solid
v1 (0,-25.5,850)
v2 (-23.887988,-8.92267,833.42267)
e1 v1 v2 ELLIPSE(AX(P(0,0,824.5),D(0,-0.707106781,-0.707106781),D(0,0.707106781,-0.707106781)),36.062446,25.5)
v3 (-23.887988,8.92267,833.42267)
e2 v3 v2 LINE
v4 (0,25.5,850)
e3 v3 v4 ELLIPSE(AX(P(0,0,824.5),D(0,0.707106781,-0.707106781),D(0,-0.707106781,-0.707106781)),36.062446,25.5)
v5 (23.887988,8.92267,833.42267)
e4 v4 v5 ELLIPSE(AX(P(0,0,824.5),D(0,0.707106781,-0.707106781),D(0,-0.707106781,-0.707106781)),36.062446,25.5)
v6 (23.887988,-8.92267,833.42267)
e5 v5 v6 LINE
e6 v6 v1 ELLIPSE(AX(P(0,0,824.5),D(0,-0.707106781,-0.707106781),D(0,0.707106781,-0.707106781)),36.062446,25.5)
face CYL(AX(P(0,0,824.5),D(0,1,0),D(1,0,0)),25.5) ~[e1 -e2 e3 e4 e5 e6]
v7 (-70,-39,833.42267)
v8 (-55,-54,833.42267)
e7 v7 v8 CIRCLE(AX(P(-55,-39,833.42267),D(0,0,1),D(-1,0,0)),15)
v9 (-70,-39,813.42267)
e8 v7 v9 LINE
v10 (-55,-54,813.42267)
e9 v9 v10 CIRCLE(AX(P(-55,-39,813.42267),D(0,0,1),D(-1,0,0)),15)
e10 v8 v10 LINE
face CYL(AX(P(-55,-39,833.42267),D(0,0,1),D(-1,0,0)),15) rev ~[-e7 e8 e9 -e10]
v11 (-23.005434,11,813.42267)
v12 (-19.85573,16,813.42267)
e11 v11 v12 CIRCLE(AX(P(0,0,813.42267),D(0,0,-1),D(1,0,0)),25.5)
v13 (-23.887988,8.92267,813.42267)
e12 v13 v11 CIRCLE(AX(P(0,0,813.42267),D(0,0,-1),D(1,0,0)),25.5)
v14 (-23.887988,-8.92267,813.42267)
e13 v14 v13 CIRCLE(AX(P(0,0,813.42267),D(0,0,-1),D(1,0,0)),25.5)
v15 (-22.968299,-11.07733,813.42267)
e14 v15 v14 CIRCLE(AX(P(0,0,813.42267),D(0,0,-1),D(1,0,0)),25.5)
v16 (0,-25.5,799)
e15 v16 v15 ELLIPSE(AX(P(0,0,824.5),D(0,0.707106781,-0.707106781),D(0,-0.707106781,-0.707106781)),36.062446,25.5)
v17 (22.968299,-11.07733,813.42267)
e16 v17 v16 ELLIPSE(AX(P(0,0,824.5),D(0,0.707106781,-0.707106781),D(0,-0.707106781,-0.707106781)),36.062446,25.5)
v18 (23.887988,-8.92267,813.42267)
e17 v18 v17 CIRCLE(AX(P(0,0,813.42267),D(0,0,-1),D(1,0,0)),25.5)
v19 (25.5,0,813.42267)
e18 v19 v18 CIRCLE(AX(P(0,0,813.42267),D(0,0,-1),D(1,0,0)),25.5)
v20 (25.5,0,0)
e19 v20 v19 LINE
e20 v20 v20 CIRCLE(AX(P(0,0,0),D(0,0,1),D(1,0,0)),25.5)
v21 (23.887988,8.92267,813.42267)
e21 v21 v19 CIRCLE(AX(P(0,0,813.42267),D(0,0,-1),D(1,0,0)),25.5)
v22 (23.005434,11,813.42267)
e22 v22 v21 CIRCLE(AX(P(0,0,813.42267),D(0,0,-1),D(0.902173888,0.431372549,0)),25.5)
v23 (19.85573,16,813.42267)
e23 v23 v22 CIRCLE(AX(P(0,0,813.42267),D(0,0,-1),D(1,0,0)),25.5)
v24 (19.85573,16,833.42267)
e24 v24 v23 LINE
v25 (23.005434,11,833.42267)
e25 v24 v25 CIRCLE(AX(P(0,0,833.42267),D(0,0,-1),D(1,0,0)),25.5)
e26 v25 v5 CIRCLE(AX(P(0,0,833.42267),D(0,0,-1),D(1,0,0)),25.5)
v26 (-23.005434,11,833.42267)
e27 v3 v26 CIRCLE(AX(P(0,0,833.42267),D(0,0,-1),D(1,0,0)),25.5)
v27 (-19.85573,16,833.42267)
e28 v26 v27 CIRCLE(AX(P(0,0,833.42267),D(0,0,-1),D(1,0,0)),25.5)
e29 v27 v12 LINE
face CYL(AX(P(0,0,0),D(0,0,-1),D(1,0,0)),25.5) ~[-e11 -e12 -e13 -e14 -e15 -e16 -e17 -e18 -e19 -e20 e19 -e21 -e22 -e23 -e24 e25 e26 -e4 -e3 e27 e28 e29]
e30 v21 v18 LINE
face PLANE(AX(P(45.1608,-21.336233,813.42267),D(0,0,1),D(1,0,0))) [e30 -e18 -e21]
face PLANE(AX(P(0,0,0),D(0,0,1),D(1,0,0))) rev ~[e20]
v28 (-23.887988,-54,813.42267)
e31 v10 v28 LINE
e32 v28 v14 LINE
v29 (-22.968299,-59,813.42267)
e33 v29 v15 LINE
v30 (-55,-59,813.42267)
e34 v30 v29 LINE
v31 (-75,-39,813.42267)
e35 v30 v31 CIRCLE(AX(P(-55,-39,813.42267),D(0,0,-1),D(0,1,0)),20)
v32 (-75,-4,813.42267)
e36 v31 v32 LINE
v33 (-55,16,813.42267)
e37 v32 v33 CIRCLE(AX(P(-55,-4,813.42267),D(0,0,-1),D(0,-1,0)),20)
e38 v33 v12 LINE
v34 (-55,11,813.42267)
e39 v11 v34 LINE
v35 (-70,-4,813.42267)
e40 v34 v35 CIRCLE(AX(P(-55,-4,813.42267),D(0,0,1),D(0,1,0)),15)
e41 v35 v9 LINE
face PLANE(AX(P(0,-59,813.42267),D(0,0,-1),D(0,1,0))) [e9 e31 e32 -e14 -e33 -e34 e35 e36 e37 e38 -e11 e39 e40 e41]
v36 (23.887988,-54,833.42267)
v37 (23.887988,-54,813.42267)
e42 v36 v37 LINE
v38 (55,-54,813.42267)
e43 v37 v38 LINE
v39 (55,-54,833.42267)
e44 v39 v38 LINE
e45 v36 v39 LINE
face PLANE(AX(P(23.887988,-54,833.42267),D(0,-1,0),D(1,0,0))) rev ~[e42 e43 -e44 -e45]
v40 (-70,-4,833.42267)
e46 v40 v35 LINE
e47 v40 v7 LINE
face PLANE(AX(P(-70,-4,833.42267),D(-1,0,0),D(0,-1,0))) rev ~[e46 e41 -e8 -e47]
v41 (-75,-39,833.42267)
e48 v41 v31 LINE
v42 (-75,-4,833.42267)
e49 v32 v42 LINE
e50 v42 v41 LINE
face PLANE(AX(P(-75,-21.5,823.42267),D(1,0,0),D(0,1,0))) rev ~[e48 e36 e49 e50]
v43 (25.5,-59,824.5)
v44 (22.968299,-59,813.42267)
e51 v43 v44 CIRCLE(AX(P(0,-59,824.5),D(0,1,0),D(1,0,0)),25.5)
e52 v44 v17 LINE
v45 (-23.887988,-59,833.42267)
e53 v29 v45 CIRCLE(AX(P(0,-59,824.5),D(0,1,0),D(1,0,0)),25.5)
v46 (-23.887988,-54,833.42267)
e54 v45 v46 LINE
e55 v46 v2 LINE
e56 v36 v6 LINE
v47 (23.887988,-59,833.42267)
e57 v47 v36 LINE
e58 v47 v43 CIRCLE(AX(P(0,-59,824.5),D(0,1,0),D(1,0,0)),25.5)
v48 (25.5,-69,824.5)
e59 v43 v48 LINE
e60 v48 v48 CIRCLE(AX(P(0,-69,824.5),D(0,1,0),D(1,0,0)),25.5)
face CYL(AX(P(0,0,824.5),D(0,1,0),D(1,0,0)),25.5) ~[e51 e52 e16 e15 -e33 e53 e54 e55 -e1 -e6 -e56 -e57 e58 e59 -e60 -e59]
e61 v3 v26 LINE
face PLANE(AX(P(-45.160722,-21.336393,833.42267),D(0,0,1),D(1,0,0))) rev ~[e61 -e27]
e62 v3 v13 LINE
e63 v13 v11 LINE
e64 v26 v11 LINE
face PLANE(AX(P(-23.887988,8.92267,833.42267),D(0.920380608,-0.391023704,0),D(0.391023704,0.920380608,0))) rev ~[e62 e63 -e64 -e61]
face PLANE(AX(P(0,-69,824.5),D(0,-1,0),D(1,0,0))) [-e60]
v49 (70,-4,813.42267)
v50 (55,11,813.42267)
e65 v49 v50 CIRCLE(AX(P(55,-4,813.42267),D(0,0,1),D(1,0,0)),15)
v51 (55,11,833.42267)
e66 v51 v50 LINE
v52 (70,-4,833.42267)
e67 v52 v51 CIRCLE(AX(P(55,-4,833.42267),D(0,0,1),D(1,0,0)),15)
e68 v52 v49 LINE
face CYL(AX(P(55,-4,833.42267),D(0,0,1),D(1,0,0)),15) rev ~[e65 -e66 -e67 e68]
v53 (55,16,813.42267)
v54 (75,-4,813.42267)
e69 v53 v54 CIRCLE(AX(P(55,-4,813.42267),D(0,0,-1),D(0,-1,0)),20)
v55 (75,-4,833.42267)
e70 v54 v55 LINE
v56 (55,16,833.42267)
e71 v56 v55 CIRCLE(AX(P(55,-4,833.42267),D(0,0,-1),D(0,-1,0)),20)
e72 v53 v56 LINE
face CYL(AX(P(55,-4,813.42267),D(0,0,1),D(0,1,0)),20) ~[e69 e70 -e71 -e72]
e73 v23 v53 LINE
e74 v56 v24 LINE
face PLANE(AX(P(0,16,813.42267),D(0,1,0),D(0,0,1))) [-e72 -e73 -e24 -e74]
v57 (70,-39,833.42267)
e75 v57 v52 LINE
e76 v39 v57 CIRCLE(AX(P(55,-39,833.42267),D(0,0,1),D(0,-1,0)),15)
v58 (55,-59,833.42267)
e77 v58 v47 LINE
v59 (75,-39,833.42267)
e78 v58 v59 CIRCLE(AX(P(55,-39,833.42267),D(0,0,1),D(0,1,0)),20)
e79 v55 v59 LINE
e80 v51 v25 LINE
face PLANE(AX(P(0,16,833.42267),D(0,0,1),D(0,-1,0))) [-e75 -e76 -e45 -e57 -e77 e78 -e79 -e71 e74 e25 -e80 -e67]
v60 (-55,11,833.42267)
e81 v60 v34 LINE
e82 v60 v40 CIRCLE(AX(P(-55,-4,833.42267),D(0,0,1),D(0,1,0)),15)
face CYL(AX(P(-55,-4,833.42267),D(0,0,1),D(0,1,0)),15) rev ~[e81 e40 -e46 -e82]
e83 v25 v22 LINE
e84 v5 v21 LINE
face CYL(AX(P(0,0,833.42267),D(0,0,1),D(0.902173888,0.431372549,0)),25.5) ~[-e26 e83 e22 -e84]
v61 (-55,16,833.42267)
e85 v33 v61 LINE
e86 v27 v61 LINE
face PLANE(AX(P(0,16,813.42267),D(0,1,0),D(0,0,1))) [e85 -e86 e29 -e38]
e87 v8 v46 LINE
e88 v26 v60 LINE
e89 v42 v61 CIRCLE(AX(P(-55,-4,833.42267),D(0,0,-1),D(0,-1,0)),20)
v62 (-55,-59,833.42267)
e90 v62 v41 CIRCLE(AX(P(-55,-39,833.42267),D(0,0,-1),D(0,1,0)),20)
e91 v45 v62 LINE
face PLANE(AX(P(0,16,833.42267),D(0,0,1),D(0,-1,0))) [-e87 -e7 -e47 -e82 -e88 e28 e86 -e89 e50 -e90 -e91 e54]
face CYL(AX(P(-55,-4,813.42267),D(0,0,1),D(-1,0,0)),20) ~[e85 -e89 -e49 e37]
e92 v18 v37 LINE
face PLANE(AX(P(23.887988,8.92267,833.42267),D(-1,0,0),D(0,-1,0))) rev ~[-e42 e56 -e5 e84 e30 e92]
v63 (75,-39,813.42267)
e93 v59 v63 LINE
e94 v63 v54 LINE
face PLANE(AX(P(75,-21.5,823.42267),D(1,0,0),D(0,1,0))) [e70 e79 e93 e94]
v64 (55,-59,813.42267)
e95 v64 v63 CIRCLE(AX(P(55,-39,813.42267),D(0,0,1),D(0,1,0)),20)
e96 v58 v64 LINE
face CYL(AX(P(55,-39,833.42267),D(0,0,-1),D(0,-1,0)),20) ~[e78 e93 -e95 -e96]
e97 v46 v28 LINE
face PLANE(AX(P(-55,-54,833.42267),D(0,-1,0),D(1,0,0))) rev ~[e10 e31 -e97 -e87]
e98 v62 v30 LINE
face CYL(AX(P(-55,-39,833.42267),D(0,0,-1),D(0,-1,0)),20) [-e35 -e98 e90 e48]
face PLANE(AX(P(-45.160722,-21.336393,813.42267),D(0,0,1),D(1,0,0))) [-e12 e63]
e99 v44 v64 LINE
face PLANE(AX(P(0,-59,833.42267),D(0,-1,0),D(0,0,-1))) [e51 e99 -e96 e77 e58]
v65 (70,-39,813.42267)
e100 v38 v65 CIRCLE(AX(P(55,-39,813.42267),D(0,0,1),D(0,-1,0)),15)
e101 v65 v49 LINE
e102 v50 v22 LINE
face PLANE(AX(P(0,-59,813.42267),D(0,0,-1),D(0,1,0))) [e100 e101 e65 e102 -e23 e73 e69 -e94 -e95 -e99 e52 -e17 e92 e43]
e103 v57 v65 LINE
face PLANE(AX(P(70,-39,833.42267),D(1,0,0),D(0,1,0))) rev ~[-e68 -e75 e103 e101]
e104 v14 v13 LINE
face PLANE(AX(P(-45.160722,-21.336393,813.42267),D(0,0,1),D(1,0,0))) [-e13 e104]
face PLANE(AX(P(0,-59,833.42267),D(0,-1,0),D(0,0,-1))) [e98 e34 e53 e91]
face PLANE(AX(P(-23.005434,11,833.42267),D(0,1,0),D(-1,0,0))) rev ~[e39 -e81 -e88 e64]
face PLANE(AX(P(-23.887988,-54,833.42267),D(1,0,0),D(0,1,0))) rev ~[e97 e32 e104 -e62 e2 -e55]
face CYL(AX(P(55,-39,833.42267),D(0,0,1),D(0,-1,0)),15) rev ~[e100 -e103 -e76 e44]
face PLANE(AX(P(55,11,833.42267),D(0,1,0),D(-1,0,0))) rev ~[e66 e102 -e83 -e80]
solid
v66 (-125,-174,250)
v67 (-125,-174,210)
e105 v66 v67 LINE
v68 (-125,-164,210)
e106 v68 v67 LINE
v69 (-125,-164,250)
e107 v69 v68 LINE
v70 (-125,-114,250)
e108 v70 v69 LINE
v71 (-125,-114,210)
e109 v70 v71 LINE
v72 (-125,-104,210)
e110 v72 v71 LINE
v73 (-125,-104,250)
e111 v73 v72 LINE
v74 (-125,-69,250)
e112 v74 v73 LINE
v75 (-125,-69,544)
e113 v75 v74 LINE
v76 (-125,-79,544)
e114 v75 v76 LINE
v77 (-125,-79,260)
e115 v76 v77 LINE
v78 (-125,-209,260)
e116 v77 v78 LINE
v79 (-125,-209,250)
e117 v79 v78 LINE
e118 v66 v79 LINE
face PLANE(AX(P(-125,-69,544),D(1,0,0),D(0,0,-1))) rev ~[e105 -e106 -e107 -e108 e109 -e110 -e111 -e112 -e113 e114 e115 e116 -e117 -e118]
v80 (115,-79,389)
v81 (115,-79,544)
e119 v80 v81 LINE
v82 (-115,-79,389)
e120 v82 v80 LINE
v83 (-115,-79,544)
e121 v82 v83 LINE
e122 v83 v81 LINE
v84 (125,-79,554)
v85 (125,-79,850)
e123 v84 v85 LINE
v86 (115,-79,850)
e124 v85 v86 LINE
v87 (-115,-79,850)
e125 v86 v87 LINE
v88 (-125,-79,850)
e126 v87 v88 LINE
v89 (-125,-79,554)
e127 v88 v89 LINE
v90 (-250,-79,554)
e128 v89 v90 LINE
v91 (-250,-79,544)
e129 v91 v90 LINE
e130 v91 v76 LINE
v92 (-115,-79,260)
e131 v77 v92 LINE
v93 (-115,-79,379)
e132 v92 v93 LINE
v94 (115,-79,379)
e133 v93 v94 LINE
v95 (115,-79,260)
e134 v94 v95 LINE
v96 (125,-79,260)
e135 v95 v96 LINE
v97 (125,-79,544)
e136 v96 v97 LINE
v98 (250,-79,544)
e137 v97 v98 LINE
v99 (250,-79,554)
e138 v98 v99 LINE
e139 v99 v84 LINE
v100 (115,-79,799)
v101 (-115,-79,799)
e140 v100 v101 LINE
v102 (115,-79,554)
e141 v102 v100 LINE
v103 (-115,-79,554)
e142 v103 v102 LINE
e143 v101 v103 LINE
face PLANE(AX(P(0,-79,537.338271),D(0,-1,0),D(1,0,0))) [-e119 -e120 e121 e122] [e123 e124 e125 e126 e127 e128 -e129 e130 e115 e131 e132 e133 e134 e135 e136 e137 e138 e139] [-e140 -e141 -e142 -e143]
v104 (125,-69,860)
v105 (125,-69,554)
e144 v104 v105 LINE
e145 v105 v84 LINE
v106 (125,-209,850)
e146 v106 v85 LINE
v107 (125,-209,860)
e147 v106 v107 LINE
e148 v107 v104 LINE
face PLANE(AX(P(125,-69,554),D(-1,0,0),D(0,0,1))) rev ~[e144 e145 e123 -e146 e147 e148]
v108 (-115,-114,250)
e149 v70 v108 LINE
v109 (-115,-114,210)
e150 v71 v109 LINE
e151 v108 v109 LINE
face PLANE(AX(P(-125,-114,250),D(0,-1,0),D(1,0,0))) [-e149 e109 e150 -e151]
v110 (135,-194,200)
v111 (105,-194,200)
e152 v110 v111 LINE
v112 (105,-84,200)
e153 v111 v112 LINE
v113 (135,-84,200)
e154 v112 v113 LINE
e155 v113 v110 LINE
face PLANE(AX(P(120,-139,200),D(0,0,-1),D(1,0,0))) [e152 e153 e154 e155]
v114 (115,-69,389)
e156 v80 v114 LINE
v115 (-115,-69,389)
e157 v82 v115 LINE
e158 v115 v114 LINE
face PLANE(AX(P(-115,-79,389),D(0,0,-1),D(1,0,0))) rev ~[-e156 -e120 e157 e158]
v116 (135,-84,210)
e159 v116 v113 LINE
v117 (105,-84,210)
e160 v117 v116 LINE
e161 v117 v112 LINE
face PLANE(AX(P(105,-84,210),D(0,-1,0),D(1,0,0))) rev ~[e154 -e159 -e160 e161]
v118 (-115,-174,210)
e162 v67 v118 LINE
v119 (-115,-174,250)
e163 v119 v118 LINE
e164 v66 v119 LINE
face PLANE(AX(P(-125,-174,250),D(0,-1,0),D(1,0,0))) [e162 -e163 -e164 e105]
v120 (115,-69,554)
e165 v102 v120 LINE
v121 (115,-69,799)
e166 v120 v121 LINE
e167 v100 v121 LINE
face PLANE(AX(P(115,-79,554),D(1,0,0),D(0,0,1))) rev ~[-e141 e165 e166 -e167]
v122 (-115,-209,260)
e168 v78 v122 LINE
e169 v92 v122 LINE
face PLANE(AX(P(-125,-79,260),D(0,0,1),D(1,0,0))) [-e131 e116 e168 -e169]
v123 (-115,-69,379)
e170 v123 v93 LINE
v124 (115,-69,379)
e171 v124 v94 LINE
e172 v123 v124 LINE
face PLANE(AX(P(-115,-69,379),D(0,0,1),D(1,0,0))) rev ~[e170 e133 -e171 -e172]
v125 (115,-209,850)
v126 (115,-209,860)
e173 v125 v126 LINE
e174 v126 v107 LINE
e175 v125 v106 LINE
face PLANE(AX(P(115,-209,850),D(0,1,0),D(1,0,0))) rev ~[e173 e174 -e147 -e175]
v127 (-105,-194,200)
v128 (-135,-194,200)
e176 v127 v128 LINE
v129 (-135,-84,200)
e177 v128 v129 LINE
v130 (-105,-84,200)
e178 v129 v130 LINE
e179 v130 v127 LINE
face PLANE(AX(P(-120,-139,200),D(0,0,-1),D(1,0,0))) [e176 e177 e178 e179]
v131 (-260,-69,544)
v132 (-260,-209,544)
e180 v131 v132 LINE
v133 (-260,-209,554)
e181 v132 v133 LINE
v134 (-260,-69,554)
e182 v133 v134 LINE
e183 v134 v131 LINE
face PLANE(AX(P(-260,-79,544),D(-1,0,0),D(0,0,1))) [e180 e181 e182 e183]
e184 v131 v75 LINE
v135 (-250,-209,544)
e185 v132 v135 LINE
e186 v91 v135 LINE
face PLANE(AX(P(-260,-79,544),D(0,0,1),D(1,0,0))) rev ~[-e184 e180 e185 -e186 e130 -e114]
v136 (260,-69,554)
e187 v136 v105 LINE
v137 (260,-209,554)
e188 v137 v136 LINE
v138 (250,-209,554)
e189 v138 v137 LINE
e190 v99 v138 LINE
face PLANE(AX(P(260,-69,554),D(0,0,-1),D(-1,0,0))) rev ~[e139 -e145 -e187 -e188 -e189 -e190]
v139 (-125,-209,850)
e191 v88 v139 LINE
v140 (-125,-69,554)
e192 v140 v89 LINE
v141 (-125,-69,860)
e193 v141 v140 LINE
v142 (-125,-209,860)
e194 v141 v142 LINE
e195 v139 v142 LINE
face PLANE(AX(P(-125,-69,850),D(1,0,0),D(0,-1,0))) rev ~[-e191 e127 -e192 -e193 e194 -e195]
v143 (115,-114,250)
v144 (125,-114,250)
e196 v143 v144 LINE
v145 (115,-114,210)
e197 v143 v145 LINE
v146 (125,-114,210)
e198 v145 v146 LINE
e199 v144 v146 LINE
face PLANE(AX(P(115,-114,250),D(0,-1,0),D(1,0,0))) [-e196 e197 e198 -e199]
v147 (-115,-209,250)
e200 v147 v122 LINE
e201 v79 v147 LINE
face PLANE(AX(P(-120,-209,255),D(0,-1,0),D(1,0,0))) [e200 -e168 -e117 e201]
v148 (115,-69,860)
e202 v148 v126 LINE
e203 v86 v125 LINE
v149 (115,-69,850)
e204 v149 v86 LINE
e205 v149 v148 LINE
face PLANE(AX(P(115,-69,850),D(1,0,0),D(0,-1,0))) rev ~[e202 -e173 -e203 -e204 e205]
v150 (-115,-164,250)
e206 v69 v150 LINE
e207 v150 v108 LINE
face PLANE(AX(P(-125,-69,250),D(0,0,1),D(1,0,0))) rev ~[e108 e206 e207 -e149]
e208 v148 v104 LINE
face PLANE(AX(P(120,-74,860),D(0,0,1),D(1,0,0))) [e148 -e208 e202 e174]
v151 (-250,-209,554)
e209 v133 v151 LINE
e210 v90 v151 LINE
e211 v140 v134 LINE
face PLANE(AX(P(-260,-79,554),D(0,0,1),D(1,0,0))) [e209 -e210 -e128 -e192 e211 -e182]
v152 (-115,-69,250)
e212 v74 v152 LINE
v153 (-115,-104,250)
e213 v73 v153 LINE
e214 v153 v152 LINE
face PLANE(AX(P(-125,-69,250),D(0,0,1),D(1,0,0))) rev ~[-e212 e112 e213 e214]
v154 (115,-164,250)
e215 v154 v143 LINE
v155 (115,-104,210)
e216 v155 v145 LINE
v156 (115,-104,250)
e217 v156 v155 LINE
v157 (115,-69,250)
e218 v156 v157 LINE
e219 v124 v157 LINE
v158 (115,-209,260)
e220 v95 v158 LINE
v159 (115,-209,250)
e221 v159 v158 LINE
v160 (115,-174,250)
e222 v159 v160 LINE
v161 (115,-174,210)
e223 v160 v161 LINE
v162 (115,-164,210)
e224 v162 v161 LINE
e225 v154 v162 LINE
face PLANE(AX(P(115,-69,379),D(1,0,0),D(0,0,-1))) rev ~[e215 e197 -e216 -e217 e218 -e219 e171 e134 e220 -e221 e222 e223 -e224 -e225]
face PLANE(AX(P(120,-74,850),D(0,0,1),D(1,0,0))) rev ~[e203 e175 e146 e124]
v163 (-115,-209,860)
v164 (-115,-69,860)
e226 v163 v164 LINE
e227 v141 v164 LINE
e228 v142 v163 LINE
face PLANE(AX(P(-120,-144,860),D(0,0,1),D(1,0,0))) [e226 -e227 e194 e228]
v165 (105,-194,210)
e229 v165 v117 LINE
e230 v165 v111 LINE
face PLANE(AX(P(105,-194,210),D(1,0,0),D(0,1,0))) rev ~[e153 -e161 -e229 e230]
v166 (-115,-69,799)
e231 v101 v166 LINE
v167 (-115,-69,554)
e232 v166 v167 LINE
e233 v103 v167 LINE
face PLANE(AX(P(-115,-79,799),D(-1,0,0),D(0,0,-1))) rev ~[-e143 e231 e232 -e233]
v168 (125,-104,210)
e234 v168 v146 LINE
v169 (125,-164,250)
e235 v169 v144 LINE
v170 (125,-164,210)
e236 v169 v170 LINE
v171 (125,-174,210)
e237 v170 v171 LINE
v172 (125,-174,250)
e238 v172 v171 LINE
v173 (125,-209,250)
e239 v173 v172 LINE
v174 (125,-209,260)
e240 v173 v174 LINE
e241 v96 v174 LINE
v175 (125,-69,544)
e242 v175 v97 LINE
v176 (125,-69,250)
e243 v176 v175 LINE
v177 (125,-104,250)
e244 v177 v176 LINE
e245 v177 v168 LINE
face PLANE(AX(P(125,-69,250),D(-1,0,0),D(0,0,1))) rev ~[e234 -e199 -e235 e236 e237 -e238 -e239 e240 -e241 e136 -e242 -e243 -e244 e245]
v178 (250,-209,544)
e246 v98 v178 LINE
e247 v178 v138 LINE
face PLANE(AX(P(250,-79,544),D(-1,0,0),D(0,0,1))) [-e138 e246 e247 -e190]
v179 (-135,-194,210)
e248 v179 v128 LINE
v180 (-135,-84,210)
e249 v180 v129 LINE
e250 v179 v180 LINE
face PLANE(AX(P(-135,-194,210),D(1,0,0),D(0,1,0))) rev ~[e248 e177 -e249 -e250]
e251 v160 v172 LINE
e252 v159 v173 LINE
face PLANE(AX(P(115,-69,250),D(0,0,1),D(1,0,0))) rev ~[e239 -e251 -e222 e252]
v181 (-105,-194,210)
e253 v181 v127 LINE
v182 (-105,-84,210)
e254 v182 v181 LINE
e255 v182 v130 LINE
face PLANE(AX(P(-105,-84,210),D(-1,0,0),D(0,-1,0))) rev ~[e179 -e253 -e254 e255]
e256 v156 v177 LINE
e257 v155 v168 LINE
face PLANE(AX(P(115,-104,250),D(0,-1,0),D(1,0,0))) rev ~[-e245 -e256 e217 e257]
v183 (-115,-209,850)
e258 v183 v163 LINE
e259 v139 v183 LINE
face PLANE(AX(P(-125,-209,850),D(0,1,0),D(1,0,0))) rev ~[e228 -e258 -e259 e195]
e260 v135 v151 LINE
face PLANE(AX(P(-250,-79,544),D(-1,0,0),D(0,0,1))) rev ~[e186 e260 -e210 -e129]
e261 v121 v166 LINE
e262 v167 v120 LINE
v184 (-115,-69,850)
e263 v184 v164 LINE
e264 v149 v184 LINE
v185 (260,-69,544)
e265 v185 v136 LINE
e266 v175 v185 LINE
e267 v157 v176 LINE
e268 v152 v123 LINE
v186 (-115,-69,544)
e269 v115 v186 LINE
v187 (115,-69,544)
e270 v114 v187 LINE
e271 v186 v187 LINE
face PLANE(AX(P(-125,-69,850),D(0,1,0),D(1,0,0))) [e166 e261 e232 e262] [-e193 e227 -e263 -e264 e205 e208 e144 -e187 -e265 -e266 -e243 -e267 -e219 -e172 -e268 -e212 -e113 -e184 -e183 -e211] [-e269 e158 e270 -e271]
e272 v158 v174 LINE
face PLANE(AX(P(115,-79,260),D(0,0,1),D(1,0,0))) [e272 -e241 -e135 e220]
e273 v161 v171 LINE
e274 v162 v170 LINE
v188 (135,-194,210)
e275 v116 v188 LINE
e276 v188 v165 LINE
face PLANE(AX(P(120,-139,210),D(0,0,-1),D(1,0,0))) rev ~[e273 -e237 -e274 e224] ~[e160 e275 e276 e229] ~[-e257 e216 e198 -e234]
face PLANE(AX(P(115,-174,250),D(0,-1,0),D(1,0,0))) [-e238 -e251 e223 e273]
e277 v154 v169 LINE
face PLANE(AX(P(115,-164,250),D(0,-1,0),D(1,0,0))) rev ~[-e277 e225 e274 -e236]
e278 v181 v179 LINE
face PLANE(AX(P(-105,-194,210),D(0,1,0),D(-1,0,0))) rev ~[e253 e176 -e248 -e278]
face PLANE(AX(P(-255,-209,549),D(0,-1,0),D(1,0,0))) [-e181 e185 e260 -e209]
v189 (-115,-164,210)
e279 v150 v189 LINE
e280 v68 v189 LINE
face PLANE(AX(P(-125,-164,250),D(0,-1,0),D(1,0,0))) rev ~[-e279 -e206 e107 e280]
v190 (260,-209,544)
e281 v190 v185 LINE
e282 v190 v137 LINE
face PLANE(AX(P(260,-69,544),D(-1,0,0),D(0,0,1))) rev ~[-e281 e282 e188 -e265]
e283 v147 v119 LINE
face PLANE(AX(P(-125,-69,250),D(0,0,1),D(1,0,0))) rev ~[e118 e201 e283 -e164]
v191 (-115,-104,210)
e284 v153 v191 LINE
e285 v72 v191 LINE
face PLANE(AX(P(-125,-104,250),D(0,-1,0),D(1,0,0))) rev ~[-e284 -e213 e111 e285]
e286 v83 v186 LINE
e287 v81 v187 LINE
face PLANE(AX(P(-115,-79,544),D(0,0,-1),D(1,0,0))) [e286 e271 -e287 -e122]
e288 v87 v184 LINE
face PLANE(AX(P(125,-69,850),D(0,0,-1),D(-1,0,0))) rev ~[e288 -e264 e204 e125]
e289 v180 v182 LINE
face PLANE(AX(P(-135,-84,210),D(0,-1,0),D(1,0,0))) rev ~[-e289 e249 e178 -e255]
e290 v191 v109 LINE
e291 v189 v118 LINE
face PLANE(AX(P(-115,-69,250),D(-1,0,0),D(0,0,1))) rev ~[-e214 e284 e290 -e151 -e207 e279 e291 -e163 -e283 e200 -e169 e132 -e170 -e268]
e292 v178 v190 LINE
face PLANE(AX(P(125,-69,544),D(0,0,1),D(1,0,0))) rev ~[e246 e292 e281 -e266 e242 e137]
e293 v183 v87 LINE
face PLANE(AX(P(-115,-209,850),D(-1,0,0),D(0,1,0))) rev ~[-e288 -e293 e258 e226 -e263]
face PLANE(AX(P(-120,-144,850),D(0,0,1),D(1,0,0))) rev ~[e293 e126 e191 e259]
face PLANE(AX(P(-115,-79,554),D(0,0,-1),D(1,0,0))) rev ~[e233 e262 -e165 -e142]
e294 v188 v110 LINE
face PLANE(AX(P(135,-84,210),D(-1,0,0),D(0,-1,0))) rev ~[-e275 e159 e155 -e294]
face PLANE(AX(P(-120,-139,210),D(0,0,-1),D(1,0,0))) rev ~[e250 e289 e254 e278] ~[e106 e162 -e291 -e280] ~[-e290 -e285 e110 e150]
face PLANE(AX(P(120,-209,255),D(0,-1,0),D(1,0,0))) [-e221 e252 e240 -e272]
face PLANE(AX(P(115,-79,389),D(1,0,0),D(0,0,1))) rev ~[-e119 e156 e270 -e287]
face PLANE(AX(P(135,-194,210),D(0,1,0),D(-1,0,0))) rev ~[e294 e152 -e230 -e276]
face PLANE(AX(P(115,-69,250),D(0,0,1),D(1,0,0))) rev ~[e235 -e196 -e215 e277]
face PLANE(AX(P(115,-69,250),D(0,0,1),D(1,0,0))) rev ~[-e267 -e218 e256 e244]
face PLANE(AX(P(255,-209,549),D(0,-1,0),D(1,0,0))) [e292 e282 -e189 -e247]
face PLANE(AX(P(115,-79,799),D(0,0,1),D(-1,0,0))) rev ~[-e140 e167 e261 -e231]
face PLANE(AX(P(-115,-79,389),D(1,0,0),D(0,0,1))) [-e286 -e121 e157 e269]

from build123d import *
from build123d import SkipClean  # not in build123d's __all__

# Parameters (mm, degrees)
F0_R      = 25.5
F1_DEPTH  = 850
F2_R      = 25.5
F3_DEPTH  = 69
F5_DEPTH  = 150
F7_DEPTH  = 75
F8_R      = 20
F10_DEPTH = 20
F12_DEPTH = 10
F13_W     = 230
F13_H     = 155
F14_DEPTH = 10
F16_W     = 10
F16_H     = 130
F16_H_2   = 10
F17_DEPTH = 10
F15_W     = 10
F15_H     = 10
F18_DEPTH = 130
F19_W     = 10
F19_H     = 10
F20_DEPTH = 40
F21_W     = 10
F21_H     = 10
F22_DEPTH = 10


with BuildPart() as f1:
    # F0 (on Top) → F1 (new body)
    with BuildSketch(Plane.XY):
        Circle(F0_R)
    extrude(amount=F1_DEPTH)

    # F2 (on Front) → F3 (join)
    with BuildSketch(Plane.XZ):
        with Locations((0, 824.5)):
            Circle(F2_R)
    with SkipClean():  # cleaning this boolean's faces spoils the solid; the shape is the same uncleaned
        extrude(amount=F3_DEPTH)

    # F4 (on face) → F5 (cut)
    with BuildSketch(Plane.XZ.offset(69)):
        with BuildLine():
            ThreePointArc((-25.5, 824.5), (0, 850), (25.5, 824.5))
            Line((25.5, 824.5), (45.5921813846, 824.5))
            Line((45.5921813846, 824.5), (45.5921813846, 859.704375267))
            Line((45.5921813846, 859.704375267), (-40.7917350531, 859.704375267))
            Line((-40.7917350531, 859.704375267), (-40.7917350531, 824.5))
            Line((-40.7917350531, 824.5), (-25.5, 824.5))
        make_face()
    extrude(amount=-F5_DEPTH, mode=Mode.SUBTRACT)

    # F6 (on Right) → F7 (join, symmetric)
    with BuildSketch(Plane.YZ):
        Polygon((-59, 833.4226703644), (-59, 823.4226703644), (-59, 813.4226703644), (16, 813.4226703644), (16, 833.4226703644), align=None)
    extrude(amount=F7_DEPTH, both=True)

    # F8
    f8_edges = [f1.edges().sort_by_distance(p)[0] for p in [
        (75, 16, 823.42267),
        (-75, 16, 823.42267),
        (-75, -59, 823.42267),
        (75, -59, 823.42267),
    ]]
    fillet(f8_edges, radius=F8_R)

    # F9 (on face) → F10 (cut)
    with BuildSketch(Plane.XY.offset(833.4226703644)):
        with BuildLine():
            Line((-23.8879876417, -54), (-23.8879876417, 8.9226703644))
            Line((-23.8879876417, 8.9226703644), (-23.0054341407, 11))
            Line((-23.0054341407, 11), (-55, 11))
            ThreePointArc((-55, 11), (-65.6066017178, 6.6066017178), (-70, -4))
            Line((-70, -4), (-70, -39))
            ThreePointArc((-70, -39), (-65.6066017178, -49.6066017178), (-55, -54))
            Line((-55, -54), (-23.8879876417, -54))
        make_face()
        with BuildLine():
            Line((23.8879876417, -8.9226703644), (23.8879876417, -54))
            Line((23.8879876417, -54), (55, -54))
            ThreePointArc((55, -54), (65.6066017178, -49.6066017178), (70, -39))
            Line((70, -39), (70, -4))
            ThreePointArc((70, -4), (65.6066017178, 6.6066017178), (55, 11))
            Line((55, 11), (23.0054341407, 11))
            ThreePointArc((23.0054341407, 11), (23.4697054992, 9.9711044415), (23.8879876417, 8.9226703644))
            Line((23.8879876417, 8.9226703644), (23.8879876417, -8.9226703644))
        make_face()
    extrude(amount=-F10_DEPTH, mode=Mode.SUBTRACT)


with BuildPart() as f12:
    # F11 (on face) → F12 (new body)
    with BuildSketch(Plane.XZ.offset(69)):
        Polygon((125, 554), (125, 850), (-125, 850), (-125, 554), (-260, 554), (-260, 544), (-125, 544), (-125, 250), (-115, 250), (-115, 379), (0, 379), (115, 379), (115, 250), (125, 250), (125, 544), (260, 544), (260, 554), align=None)
    extrude(amount=F12_DEPTH)

    # F13 (on face) → F14 (cut)
    with BuildSketch(Plane.XZ.offset(79)):
        Polygon((115, 799), (0, 799), (-115, 799), (-115, 554), (115, 554), align=None)
        with Locations((0, 466.5)):
            Rectangle(F13_W, F13_H)
    extrude(amount=-F14_DEPTH, mode=Mode.SUBTRACT)

    # F16 (on face) → F17 (join)
    with BuildSketch(Plane.XY.offset(850)):
        with Locations((-120, -144)):
            Rectangle(F16_W, F16_H)
        with Locations((120, -74)):
            Rectangle(F16_W, F16_H_2)
        with Locations((-120, -74)):
            Rectangle(F16_W, F16_H_2)
        with Locations((120, -144)):
            Rectangle(F16_W, F16_H)
    extrude(amount=F17_DEPTH)

    # F15 (on face) → F18 (join)
    with BuildSketch(Plane.XZ.offset(79)):
        with Locations((-255, 549)):
            Rectangle(F15_W, F15_H)
        with Locations((255, 549)):
            Rectangle(F15_W, F15_H)
        with Locations((120, 255)):
            Rectangle(F15_W, F15_H)
        with Locations((-120, 255)):
            Rectangle(F15_W, F15_H)
    extrude(amount=F18_DEPTH)

    # F19 (on face) → F20 (join)
    with BuildSketch(Plane(origin=(0, 0, 250), x_dir=(1, 0, 0), z_dir=(0, 0, -1))):
        with Locations((-120, 109)):
            Rectangle(F19_W, F19_H)
        with Locations((-120, 169)):
            Rectangle(F19_W, F19_H)
        with Locations((120, 169)):
            Rectangle(F19_W, F19_H)
        with Locations((120, 109)):
            Rectangle(F19_W, F19_H)
    extrude(amount=F20_DEPTH)

    # F21 (on face) → F22 (join)
    with BuildSketch(Plane(origin=(0, 0, 210), x_dir=(1, 0, 0), z_dir=(0, 0, -1))):
        Polygon((-135, 194), (-135, 104), (-135, 84), (-105, 84), (-105, 194), align=None)
        with Locations((-120, 109)):
            Rectangle(F21_W, F21_H, mode=Mode.SUBTRACT)
        Polygon((105, 84), (135, 84), (135, 104), (135, 194), (105, 194), align=None)
        with Locations((-120, 109)):
            Rectangle(F21_W, F21_H)
    extrude(amount=F22_DEPTH)


solid = Compound([f1.part, f12.part])
